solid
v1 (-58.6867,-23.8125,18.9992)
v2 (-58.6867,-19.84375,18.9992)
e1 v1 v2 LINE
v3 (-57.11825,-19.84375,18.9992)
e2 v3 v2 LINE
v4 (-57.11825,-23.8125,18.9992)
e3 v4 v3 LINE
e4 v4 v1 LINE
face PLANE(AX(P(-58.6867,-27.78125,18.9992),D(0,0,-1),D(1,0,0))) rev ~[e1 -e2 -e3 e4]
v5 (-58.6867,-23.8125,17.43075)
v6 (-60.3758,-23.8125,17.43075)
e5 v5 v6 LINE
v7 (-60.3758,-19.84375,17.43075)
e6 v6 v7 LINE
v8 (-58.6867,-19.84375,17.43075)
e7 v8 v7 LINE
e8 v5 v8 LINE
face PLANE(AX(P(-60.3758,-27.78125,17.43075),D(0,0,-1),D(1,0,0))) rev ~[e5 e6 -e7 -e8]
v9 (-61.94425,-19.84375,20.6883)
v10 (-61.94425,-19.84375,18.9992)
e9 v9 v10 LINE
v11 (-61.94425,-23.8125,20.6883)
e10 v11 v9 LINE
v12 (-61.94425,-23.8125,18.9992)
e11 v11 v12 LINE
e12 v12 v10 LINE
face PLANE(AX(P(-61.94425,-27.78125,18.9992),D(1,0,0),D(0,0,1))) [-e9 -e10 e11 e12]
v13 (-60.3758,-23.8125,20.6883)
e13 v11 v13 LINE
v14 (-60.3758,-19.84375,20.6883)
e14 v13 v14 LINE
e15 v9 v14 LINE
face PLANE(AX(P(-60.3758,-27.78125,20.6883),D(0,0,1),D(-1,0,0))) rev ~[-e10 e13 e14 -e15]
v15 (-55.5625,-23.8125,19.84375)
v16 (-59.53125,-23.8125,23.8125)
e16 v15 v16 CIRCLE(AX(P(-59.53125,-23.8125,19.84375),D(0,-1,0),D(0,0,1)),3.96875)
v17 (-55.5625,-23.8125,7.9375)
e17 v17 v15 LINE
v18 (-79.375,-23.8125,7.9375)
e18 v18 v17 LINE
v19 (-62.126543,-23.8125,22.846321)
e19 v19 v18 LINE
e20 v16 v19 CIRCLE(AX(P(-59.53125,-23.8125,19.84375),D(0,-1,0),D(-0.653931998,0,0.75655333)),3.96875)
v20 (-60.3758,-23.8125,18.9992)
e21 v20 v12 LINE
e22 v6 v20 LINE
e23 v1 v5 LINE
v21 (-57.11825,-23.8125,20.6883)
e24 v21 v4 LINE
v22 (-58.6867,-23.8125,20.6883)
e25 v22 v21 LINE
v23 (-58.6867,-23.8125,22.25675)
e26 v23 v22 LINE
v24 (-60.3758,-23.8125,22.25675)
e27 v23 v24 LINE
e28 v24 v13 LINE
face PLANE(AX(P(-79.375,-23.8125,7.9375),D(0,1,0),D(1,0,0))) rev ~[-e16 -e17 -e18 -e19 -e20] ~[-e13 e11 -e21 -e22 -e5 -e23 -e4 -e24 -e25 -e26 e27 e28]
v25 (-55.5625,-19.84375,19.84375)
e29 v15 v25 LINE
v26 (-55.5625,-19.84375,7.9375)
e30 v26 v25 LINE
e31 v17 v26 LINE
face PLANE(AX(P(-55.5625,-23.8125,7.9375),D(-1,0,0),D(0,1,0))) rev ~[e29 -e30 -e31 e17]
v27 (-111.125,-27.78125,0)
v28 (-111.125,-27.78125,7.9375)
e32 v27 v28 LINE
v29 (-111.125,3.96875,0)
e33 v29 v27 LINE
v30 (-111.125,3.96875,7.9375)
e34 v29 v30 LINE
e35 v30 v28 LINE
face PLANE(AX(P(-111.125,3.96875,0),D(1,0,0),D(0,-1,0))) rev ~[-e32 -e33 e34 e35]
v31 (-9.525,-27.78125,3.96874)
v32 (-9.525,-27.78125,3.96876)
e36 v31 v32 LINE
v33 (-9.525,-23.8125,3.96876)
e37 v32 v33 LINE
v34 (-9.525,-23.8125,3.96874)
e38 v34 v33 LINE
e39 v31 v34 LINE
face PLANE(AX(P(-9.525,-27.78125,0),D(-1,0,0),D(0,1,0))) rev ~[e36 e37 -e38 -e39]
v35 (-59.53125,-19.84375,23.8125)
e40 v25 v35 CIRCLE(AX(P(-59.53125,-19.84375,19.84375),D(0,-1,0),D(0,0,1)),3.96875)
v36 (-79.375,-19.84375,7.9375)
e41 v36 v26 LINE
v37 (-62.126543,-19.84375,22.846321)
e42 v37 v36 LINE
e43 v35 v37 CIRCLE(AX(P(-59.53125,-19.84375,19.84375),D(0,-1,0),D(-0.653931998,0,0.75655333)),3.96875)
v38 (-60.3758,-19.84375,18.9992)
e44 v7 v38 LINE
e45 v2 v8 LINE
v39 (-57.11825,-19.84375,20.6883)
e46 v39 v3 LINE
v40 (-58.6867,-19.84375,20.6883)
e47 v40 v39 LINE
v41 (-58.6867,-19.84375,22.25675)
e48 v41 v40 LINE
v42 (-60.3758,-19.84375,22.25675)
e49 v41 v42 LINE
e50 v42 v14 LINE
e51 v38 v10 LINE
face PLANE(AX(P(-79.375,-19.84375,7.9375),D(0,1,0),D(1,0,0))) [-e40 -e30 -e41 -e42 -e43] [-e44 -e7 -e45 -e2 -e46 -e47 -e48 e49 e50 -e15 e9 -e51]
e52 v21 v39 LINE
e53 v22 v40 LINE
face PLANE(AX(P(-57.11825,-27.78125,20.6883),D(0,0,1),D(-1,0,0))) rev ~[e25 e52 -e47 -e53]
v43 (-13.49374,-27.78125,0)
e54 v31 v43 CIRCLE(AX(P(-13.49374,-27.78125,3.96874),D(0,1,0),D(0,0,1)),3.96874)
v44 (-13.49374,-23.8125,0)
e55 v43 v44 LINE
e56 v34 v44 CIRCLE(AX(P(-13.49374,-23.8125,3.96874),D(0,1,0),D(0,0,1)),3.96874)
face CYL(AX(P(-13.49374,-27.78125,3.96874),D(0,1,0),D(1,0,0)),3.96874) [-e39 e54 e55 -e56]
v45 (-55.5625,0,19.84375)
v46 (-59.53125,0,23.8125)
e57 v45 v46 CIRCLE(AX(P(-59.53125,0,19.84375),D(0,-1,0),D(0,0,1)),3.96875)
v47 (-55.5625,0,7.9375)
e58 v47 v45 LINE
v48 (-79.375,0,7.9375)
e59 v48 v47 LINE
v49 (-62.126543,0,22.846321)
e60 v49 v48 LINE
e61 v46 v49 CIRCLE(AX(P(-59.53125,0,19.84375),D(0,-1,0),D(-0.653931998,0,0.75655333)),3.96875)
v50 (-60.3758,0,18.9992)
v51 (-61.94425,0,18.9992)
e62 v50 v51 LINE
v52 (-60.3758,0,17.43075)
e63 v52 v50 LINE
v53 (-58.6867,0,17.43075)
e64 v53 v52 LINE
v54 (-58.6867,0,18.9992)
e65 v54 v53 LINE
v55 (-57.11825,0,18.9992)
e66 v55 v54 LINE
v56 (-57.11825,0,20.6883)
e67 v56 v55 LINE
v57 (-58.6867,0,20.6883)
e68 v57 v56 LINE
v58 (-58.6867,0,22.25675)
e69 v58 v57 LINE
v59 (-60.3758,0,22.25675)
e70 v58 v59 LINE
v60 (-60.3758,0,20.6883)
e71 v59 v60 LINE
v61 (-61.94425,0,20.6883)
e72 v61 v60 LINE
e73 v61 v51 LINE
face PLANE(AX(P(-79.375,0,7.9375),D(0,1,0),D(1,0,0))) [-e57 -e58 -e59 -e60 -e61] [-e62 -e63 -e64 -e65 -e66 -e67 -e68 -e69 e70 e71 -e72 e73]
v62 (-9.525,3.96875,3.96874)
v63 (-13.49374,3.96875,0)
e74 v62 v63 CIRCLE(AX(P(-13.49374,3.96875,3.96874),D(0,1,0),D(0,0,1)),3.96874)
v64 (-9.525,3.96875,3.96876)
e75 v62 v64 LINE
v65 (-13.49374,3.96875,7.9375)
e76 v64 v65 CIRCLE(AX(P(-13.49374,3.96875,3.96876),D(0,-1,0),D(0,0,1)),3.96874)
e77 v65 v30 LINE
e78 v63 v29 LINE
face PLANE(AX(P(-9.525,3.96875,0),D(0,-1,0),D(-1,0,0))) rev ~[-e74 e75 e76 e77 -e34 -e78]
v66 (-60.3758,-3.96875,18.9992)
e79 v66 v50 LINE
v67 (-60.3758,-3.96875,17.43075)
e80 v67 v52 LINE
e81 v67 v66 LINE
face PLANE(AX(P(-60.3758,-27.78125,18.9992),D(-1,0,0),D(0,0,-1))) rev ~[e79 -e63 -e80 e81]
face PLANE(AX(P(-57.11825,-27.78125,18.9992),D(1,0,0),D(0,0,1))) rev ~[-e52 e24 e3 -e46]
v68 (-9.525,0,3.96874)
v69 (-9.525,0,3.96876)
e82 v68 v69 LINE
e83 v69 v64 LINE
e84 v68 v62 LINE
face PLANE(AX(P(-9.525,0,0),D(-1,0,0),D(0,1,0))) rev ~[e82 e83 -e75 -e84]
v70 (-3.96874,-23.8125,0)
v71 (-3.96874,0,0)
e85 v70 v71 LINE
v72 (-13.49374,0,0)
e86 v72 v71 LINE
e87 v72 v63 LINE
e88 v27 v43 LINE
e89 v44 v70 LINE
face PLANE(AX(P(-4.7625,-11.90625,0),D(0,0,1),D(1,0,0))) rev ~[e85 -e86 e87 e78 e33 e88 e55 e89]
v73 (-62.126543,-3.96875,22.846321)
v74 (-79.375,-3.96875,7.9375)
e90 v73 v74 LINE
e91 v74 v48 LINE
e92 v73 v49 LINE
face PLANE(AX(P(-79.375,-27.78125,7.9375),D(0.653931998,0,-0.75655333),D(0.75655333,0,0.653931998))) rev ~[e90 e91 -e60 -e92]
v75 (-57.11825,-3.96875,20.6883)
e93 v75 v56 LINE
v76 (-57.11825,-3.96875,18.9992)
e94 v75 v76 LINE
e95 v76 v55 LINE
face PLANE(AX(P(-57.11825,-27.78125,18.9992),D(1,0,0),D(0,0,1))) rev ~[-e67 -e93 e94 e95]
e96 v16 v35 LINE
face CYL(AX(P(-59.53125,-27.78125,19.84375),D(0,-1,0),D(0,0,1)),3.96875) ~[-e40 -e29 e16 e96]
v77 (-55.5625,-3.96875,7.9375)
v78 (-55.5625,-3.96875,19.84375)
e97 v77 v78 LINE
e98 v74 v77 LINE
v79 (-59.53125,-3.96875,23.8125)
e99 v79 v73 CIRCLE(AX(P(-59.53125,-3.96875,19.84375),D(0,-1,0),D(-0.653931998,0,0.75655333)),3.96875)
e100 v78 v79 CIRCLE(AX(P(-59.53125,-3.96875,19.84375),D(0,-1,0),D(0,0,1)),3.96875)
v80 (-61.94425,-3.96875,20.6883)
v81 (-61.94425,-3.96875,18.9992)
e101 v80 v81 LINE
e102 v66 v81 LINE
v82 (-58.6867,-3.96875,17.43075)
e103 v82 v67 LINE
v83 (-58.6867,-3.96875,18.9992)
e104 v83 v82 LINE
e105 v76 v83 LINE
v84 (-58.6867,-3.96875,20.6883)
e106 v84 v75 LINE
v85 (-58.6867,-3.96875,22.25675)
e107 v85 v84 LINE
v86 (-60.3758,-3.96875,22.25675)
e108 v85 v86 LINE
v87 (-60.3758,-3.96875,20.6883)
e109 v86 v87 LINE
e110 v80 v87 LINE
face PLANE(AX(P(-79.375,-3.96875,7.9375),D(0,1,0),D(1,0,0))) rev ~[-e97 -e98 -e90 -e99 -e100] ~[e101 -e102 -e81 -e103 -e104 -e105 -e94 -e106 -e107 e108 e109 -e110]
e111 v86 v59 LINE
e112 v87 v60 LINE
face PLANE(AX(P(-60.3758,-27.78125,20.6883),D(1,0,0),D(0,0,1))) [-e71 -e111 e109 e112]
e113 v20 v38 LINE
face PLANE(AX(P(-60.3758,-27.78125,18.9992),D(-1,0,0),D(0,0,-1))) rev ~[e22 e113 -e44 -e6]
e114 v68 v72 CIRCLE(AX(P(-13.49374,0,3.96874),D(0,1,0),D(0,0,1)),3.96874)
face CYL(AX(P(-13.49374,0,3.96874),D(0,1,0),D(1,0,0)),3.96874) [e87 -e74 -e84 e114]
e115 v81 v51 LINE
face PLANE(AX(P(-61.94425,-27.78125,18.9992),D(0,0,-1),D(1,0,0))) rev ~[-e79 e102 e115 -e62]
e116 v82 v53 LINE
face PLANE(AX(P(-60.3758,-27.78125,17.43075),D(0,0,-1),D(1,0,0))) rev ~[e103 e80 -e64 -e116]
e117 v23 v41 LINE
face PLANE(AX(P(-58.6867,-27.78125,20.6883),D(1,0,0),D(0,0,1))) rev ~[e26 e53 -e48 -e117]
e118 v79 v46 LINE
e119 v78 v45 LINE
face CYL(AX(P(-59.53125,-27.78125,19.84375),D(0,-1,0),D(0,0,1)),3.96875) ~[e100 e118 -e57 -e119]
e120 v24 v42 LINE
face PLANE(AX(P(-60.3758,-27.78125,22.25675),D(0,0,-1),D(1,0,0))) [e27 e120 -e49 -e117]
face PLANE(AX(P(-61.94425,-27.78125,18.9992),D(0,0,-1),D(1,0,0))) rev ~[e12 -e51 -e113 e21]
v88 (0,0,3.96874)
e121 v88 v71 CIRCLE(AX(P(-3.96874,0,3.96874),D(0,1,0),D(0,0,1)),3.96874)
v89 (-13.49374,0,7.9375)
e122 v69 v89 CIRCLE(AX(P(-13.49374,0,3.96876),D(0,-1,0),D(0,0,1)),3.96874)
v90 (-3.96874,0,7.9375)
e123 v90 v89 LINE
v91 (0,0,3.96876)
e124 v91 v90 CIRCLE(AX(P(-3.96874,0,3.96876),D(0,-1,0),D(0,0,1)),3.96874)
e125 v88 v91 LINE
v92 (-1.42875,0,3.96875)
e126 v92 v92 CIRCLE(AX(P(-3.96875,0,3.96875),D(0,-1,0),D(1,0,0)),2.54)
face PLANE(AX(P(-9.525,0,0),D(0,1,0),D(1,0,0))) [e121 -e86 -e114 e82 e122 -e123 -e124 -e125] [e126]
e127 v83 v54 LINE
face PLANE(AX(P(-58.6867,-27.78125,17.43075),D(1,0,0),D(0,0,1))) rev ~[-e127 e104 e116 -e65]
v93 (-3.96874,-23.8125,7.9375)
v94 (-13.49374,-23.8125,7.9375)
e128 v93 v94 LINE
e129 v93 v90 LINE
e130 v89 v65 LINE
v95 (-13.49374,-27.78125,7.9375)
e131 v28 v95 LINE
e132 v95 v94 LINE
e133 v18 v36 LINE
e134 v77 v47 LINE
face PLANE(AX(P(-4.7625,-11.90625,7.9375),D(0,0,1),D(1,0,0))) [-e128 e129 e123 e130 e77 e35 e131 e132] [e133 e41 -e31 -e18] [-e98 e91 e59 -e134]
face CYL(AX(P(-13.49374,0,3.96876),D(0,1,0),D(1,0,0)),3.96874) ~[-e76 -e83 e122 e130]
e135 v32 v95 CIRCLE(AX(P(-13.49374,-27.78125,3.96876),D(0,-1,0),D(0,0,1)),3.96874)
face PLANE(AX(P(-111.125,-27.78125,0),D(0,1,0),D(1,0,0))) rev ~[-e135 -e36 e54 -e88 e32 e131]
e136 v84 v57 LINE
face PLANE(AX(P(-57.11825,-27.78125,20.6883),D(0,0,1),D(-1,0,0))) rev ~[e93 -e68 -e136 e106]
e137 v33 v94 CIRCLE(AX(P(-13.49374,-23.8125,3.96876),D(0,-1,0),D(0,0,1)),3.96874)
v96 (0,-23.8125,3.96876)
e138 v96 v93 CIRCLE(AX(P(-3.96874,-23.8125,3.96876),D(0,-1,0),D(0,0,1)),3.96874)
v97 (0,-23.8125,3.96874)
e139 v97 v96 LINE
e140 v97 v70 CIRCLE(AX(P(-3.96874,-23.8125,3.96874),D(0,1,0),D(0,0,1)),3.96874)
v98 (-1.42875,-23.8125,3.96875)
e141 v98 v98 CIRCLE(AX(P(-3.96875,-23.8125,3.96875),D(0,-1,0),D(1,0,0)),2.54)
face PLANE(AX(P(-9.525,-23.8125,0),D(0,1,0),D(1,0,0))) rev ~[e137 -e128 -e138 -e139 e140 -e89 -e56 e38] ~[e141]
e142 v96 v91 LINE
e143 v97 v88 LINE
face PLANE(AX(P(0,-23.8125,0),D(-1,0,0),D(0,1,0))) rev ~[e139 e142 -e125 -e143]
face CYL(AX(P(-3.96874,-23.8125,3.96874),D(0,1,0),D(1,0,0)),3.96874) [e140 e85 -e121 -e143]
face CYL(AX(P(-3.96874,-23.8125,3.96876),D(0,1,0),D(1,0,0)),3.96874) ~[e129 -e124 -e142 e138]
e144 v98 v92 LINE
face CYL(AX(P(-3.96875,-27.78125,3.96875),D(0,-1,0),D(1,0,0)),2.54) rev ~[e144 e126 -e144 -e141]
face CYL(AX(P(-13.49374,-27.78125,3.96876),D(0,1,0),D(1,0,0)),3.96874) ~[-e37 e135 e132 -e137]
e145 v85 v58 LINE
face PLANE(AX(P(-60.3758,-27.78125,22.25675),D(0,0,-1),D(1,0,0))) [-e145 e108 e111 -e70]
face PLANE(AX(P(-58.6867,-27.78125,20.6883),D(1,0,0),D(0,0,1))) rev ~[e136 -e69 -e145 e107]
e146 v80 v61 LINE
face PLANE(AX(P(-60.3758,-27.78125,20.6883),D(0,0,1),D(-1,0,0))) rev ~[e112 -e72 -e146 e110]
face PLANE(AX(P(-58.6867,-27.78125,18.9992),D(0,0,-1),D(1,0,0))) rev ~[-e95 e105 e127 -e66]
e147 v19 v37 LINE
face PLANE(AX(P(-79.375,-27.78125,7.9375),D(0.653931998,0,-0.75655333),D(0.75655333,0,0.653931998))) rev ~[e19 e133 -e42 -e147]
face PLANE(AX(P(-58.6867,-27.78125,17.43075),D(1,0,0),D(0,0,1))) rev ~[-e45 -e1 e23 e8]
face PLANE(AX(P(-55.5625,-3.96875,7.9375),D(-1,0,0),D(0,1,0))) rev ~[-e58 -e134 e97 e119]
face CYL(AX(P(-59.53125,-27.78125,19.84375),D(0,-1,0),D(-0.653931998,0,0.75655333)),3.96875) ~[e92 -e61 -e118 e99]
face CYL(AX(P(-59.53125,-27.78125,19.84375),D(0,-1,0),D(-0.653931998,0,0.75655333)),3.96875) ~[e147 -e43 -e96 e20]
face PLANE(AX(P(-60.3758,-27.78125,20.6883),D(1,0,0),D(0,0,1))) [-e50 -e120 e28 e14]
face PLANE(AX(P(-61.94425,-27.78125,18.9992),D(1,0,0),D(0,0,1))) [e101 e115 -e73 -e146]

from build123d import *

# Parameters (mm, degrees)
F0_W     = 9.525
F0_H     = 23.8125
F1_DEPTH = 7.9375
F2_R     = 3.96874
F3_W     = 23.8125
F3_H     = 3.96875
F4_DEPTH = 15.875
F5_W     = 1.6891
F5_H     = 1.56845
F5_H_2   = 1.6891
F5_W_2   = 1.56845
F5_R     = 2.54
F6_DEPTH = 31.75


# Not quite as in the source:
# - a fillet or chamfer is up to 0.001 mm smaller than in the source, because OpenCascade refuses the exact size


with BuildPart() as f1:
    # F0 (on Top) → F1 (new body)
    with BuildSketch(Plane.XY):
        with Locations((-4.7625, -11.90625)):
            Rectangle(F0_W, F0_H)
        Polygon((-9.525, -23.8125), (-9.525, 0), (-9.525, 3.96875), (-111.125, 3.96875), (-111.125, -27.78125), (-9.525, -27.78125), align=None)
    extrude(amount=F1_DEPTH)

    # F2 (radius 3.96875 in the source; OpenCascade refuses exactly that, so slightly less here)
    f2_edges = [f1.edges().sort_by_distance(p)[0] for p in [
        (-9.525, -25.796875, 7.9375),
        (-9.525, -25.796875, 0),
        (0, -11.90625, 7.9375),
        (0, -11.90625, 0),
        (-9.525, 1.984375, 7.9375),
        (-9.525, 1.984375, 0),
    ]]
    fillet(f2_edges, radius=F2_R)

    # F3 (on face) → F4 (join)
    with BuildSketch(Plane.XY.offset(7.9375)):
        with Locations((-67.46875, -21.828125)):
            Rectangle(F3_W, F3_H)
        with Locations((-67.46875, -1.984375)):
            Rectangle(F3_W, F3_H)
    extrude(amount=F4_DEPTH)

    # F5 (on face) → F6 (cut, through all)
    with BuildSketch(Plane.XZ.offset(27.78125)):
        with BuildLine():
            Line((-55.5625, 23.8125), (-59.53125, 23.8125))
            ThreePointArc((-59.53125, 23.8125), (-56.7249199622, 22.6500800378), (-55.5625, 19.84375))
            Line((-55.5625, 19.84375), (-55.5625, 23.8125))
        make_face()
        with BuildLine():
            Line((-59.53125, 23.8125), (-79.375, 23.8125))
            Line((-79.375, 23.8125), (-79.375, 7.9375))
            Line((-79.375, 7.9375), (-62.126542618, 22.8463210299))
            ThreePointArc((-62.126542618, 22.8463210299), (-60.915902084, 23.5631202651), (-59.53125, 23.8125))
        make_face()
        with Locations((-59.53125, 18.214975)):
            Rectangle(F5_W, F5_H)
        with Locations((-59.53125, 19.84375)):
            Rectangle(F5_W, F5_H_2)
        with Locations((-57.902475, 19.84375)):
            Rectangle(F5_W_2, F5_H_2)
        with Locations((-61.160025, 19.84375)):
            Rectangle(F5_W_2, F5_H_2)
        with Locations((-59.53125, 21.472525)):
            Rectangle(F5_W, F5_H)
        with Locations((-3.96875, 3.96875)):
            Circle(F5_R)
    extrude(amount=-F6_DEPTH, mode=Mode.SUBTRACT)


solid = f1.part
